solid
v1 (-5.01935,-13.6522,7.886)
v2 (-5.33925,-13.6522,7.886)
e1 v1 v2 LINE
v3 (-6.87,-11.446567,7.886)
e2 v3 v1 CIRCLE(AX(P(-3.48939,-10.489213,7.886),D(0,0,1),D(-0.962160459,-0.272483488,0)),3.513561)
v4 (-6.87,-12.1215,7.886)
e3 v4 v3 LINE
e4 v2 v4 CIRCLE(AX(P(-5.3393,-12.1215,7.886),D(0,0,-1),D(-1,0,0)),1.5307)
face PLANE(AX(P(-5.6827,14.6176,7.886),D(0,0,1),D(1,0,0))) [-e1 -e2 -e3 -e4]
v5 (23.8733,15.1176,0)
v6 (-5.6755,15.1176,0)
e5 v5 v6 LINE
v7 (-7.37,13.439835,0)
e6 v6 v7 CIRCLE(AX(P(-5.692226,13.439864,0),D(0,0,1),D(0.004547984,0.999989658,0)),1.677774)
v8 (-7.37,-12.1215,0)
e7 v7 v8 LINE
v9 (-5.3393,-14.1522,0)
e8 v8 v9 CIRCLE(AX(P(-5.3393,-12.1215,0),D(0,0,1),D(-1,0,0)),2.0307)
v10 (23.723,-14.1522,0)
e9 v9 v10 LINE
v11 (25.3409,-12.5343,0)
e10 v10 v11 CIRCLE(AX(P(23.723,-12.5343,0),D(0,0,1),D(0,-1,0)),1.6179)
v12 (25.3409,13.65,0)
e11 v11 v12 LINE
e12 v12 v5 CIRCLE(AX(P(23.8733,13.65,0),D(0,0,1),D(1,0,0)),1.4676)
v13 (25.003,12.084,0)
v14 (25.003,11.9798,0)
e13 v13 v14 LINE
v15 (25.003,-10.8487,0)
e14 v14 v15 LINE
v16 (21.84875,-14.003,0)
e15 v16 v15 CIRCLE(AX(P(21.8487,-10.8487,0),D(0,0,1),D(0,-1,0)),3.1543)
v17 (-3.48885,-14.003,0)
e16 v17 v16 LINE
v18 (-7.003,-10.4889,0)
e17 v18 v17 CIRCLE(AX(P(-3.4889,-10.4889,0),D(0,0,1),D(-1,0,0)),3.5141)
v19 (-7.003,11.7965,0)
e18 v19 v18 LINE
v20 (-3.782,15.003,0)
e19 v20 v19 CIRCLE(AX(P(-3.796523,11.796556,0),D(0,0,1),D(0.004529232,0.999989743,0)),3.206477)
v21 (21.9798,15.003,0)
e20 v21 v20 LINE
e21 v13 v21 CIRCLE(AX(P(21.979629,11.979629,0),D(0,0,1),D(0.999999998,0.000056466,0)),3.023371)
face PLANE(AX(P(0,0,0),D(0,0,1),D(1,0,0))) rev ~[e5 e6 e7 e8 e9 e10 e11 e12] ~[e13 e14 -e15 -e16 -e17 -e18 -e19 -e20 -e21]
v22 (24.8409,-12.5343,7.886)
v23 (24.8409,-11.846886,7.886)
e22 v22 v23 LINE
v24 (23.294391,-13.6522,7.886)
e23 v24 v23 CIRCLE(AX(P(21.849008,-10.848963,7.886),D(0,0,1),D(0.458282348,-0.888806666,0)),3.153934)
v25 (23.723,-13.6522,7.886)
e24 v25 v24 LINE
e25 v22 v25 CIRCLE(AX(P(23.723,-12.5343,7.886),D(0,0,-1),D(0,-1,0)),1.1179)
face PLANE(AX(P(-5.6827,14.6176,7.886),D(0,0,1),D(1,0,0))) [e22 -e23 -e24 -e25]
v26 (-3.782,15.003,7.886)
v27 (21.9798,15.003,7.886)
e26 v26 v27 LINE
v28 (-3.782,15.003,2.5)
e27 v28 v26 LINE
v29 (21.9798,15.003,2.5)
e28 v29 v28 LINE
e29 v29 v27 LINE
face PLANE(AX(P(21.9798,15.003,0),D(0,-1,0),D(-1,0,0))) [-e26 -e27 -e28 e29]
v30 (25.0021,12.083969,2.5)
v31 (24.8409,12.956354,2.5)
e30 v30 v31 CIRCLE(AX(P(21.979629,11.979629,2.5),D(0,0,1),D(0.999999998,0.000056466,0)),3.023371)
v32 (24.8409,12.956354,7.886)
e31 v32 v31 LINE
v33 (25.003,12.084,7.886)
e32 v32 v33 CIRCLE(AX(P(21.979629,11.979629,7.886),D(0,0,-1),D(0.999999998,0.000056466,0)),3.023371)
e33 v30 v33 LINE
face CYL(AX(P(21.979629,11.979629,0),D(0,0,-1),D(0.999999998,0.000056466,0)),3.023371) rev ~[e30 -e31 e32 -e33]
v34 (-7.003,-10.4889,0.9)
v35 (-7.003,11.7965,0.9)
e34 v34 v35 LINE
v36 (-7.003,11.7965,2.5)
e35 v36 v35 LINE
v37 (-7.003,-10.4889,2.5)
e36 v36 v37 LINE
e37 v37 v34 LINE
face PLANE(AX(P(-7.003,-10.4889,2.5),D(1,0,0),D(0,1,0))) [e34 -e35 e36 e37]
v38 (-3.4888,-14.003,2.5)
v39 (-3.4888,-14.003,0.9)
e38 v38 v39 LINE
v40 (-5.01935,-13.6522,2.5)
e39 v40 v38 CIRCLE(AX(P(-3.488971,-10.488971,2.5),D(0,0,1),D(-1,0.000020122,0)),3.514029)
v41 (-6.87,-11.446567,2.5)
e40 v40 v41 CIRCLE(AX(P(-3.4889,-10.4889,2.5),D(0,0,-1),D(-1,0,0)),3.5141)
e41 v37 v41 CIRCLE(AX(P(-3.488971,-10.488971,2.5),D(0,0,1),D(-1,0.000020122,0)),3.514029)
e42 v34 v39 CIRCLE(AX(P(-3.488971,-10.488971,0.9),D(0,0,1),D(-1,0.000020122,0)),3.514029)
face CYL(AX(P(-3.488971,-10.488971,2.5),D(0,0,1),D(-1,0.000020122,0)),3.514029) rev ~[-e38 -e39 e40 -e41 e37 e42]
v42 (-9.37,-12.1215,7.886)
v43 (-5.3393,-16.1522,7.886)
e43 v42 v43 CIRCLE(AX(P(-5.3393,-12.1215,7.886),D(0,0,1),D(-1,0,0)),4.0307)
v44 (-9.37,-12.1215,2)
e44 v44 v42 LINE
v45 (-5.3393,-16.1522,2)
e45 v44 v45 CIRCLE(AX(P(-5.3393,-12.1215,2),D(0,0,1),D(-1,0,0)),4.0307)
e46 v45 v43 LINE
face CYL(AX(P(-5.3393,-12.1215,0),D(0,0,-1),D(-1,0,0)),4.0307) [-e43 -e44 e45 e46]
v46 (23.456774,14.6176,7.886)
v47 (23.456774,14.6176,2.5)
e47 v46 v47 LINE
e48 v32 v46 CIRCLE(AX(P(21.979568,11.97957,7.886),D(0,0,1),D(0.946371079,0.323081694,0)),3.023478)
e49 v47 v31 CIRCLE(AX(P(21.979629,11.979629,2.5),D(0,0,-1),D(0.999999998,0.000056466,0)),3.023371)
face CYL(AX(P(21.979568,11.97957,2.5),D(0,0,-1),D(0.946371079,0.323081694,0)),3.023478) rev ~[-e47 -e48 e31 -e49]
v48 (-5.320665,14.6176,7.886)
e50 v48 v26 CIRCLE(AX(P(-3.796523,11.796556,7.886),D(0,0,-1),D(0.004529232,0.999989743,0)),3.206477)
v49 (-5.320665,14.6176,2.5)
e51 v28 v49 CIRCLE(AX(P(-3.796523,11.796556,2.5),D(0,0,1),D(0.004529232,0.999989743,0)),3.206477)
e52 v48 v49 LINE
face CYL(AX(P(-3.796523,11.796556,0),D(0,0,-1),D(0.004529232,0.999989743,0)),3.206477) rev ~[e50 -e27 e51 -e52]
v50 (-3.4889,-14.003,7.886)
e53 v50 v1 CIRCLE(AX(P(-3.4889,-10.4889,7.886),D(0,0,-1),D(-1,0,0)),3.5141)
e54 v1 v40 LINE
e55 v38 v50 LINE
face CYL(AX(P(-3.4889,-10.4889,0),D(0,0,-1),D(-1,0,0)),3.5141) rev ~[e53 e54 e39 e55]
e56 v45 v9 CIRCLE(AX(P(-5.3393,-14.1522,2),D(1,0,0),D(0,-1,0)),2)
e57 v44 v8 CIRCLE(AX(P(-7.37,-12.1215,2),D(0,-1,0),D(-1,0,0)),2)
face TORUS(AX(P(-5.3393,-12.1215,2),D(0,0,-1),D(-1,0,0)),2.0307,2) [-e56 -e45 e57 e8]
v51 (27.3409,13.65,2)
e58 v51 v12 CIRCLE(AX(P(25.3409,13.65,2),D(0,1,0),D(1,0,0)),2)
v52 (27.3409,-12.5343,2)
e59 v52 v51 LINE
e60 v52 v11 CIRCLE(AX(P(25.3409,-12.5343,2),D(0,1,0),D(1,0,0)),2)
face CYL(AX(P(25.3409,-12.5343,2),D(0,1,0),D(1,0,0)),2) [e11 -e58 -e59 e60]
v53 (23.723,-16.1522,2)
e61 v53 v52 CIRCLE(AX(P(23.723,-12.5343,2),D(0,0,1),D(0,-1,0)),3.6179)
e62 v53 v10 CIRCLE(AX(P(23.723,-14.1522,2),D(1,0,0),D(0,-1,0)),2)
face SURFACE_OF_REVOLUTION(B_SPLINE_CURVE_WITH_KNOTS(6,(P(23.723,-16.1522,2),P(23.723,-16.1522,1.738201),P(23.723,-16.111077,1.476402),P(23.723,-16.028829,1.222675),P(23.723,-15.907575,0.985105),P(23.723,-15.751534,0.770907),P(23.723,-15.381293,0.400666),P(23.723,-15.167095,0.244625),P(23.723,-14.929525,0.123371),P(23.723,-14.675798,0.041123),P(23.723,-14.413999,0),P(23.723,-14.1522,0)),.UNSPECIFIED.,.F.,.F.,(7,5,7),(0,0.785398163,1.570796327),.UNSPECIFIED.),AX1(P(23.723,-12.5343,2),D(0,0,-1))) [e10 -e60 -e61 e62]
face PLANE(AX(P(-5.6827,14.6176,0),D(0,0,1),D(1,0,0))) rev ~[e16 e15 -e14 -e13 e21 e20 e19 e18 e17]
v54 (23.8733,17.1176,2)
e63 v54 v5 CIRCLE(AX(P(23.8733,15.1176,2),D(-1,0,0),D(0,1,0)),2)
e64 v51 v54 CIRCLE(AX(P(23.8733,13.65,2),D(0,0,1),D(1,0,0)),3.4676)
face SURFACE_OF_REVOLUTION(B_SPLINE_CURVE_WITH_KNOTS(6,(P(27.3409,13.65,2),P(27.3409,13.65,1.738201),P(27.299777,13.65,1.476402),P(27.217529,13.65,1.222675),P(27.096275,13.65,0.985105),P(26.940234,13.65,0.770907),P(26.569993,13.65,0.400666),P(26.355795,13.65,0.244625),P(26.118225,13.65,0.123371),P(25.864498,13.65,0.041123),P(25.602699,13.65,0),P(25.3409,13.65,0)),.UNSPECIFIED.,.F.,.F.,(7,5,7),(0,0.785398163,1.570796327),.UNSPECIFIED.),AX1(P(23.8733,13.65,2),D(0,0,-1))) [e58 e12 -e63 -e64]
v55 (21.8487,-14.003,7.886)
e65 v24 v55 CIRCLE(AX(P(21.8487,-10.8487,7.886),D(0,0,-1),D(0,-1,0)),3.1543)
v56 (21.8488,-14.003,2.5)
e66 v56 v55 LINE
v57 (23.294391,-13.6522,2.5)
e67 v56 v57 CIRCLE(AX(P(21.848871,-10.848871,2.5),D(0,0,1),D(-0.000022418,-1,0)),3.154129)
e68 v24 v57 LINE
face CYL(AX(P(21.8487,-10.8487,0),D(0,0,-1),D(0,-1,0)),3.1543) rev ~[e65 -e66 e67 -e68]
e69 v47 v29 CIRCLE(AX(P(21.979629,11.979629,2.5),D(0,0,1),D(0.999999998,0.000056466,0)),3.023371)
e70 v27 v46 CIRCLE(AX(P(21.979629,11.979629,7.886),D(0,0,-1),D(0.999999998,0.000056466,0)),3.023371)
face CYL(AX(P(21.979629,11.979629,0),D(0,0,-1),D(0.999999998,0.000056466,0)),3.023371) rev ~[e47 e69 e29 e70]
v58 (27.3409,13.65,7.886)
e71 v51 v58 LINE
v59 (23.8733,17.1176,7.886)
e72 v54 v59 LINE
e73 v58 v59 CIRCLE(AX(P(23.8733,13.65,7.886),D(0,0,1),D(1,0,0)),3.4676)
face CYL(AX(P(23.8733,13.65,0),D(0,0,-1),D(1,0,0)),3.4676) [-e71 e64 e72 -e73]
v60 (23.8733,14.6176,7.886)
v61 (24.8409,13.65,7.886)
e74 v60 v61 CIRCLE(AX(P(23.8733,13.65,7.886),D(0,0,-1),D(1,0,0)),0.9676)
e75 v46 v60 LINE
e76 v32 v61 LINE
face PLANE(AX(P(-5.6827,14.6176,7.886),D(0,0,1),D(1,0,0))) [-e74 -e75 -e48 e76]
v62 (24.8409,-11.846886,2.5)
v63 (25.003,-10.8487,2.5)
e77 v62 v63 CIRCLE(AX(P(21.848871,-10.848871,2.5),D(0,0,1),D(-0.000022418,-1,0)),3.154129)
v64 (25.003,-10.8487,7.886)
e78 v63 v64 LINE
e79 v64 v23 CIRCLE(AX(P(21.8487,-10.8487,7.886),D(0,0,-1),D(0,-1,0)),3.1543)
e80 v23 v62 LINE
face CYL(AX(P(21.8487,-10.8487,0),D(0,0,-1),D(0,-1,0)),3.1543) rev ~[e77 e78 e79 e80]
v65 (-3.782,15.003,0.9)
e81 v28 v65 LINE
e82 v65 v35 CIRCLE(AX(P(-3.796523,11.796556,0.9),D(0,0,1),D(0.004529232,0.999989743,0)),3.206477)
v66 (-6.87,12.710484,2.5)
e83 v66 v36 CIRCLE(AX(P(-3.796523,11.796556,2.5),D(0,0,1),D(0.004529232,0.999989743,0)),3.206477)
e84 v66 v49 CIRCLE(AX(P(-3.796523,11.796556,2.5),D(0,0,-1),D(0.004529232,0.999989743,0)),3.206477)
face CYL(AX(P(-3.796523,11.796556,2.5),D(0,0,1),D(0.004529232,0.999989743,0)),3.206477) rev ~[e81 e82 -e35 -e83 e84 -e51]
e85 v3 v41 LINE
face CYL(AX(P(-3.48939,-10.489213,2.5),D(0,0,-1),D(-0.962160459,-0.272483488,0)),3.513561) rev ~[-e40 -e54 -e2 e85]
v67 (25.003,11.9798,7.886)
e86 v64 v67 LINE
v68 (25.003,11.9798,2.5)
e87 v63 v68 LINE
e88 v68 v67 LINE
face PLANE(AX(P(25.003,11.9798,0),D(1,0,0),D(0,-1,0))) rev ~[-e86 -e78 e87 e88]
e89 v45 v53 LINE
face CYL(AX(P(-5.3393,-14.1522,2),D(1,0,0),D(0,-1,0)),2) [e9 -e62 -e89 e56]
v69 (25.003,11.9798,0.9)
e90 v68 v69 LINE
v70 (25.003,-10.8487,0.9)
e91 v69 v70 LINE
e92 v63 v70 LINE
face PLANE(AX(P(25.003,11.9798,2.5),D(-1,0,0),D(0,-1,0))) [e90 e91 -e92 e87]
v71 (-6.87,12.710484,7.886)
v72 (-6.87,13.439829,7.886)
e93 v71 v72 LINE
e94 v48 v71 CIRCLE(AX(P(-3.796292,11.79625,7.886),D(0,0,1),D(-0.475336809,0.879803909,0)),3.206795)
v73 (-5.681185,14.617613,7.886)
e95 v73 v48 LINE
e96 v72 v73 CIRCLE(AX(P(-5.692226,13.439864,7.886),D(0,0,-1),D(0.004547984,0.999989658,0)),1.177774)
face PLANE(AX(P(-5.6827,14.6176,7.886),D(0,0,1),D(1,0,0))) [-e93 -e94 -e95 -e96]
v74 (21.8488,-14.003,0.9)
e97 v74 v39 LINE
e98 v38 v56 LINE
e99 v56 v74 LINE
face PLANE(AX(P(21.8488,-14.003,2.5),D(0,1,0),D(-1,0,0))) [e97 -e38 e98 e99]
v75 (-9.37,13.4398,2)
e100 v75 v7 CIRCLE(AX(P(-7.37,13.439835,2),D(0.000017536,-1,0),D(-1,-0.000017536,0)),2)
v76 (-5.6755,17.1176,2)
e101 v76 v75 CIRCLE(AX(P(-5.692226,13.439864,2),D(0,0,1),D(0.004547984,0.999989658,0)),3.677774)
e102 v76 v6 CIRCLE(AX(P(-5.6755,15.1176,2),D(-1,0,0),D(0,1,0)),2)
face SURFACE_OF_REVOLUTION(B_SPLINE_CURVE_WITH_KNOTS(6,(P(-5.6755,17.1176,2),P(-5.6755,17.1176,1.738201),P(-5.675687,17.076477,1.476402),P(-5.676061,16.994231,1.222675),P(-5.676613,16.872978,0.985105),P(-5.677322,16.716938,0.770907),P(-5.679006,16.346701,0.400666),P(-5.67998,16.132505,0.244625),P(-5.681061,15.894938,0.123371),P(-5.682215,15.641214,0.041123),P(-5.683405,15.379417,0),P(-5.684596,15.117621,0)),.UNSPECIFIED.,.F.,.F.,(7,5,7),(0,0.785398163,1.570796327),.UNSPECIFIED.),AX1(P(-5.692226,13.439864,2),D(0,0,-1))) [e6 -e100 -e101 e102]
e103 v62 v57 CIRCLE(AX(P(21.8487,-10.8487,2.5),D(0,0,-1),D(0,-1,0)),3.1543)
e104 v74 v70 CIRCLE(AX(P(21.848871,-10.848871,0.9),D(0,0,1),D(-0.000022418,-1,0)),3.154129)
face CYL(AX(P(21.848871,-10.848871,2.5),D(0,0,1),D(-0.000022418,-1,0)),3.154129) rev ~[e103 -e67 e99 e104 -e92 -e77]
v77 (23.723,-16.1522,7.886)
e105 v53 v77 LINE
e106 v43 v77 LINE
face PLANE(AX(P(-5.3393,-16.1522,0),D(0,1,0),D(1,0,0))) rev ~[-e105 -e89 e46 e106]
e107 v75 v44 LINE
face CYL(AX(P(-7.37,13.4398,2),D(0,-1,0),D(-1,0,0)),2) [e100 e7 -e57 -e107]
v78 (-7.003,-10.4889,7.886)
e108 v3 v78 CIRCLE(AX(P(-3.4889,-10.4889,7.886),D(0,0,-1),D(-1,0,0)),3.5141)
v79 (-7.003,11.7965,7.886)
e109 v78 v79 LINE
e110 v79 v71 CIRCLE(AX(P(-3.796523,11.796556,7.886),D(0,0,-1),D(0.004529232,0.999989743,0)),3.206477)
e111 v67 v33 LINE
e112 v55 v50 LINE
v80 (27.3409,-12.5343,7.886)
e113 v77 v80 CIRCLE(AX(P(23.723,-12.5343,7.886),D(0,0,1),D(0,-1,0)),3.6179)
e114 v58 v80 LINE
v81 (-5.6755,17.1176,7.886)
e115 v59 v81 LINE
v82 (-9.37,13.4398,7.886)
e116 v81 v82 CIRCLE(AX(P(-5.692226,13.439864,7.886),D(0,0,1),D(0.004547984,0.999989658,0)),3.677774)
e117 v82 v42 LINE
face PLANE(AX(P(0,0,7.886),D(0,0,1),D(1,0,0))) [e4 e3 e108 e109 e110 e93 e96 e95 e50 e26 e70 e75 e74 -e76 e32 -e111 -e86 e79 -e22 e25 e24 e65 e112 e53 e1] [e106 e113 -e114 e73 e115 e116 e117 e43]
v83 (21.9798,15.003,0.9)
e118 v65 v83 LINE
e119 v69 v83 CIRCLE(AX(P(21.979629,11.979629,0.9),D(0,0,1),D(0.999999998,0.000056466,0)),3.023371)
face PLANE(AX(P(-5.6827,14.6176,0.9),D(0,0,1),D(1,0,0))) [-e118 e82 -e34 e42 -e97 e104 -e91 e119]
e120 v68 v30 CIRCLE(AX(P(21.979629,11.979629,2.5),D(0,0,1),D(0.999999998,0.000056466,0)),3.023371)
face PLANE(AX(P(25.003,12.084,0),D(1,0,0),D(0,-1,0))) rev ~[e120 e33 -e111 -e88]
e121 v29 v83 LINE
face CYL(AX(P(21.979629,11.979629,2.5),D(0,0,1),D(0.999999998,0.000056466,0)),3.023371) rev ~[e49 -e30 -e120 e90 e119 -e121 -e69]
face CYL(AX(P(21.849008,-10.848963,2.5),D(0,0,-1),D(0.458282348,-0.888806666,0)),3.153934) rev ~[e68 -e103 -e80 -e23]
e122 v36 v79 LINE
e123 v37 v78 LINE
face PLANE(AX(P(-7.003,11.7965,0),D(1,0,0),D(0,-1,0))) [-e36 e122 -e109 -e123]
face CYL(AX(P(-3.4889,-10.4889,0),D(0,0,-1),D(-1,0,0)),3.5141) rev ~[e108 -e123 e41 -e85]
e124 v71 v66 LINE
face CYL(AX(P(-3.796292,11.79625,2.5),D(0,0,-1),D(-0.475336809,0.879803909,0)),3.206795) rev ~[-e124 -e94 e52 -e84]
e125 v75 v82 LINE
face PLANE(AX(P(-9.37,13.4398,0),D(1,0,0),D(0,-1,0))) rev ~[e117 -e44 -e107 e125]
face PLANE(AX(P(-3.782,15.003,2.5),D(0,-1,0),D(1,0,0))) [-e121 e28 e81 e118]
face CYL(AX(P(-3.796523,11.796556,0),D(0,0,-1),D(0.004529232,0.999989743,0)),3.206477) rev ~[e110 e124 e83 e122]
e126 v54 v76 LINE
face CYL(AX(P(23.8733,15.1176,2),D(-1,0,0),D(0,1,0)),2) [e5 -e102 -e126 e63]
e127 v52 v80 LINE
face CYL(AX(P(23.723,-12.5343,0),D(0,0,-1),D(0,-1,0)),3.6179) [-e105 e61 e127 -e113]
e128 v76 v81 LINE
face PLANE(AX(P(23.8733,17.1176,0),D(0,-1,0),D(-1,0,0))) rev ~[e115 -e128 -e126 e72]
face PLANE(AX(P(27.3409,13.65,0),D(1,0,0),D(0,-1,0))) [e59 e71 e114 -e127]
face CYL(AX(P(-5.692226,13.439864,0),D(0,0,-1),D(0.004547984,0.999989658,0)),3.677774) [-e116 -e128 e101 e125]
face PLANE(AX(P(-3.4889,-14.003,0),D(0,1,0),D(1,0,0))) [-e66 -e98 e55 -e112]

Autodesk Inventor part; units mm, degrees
ref_plane "YZ Plane" through (0, 0, 0) normal (1, 0, 0) x (0, 1, 0)
ref_plane "XZ Plane" through (0, 0, 0) normal (0, 1, 0) x (-1, 0, 0)
sketch "Sketch1" plane through (-3.508, -14.003, 0) normal (0, 0, 1) x (1, 0, 0)
  line L0 (-3.495, 25.7995) -> (-3.495, 3.5141)
  line L1 (28.511, 26.087) -> (28.511, 3.1543)
  line L2 (0.0191, 0) -> (25.3567, 0)
  line L3 (25.4878, 29.006) -> (-0.274, 29.006)
  arc A0 (-3.495, 3.5141) -> (0.0191, 0) centre (0.0191, 3.5141) ccw
  arc A1 (25.3567, 0) -> (28.511, 3.1543) centre (25.3567, 3.1543) ccw
  arc A2 (28.511, 25.9828) -> (25.4878, 29.006) centre (25.4878, 25.9827) ccw
  arc A3 (-0.274, 29.006) -> (-3.495, 25.7995) centre (-0.2885, 25.7995) ccw
  line L4 (9.8544, 29.006) -> (9.8544, 34.006) construction
  point P0 (12.6069, 14.6206)
  dimension "d0" = 5
sketch "Sketch3" plane through (0, 0, 0) normal (0, 0, 1) x (1, 0, 0)
  arc A0 (-5.6755, 17.1176) -> (-9.37, 13.4398) centre (-5.6922, 13.4398) ccw
  line L0 (-9.37, 13.4398) -> (-9.37, -12.1215)
  arc A1 (-9.37, -12.1215) -> (-5.3393, -16.1522) centre (-5.3393, -12.1215) ccw
  line L1 (-5.3393, -16.1522) -> (23.723, -16.1522)
  arc A2 (23.723, -16.1522) -> (27.3409, -12.5343) centre (23.723, -12.5343) ccw
  line L2 (27.3409, 13.7696) -> (27.3409, -12.5343)
  arc A3 (27.3409, 13.65) -> (23.8733, 17.1176) centre (23.8733, 13.65) ccw
  line L3 (23.8733, 17.1176) -> (-5.6755, 17.1176)
  point P0 (0, 0)
  point P1 (25.003, 11.9798)
  point P2 (9.0989, 0.6176)
extrude "Extrusion1" add sketch "Sketch3" along normal blind 7.886
shell "Shell1" thickness 2.5 removed faces 1 at (4.2862, 6.0277, 7.886)
ref_plane "Work Plane3" through (-5.6827, 14.6176, 2.5) normal (0, 0, 1) x (1, 0, 0)
sketch "Sketch4" plane through (-5.6827, 14.6176, 2.5) normal (0, 0, 1) x (1, 0, 0)
  point P0 (5.6827, -14.6176)
extrude "Extrusion2" cut sketch "Sketch1" along normal blind 21
sketch "Sketch5" plane through (-5.6827, 14.6176, 2.5) normal (0, 0, 1) x (1, 0, 0)
  arc A0 (0.3621, 0) -> (-1.1873, -1.9071) centre (1.8862, -2.8211) ccw projected
  line L0 (0.3621, 0) -> (0, 0) projected
  arc A1 (0, 0) -> (-1.1873, -1.1778) centre (-0.0094, -1.1778) ccw projected
  line L1 (-1.1873, -1.1778) -> (-1.1873, -1.9071) projected
  arc A2 (-1.1873, -26.0642) -> (0.6634, -28.2698) centre (2.1939, -25.1065) ccw projected
  line L2 (-1.1873, -26.0642) -> (-1.1873, -26.7391) projected
  arc A3 (-1.1873, -26.7391) -> (0.3435, -28.2698) centre (0.3435, -26.7391) ccw projected
  line L3 (0.3435, -28.2698) -> (0.6634, -28.2698) projected
  arc A4 (28.9771, -28.2698) -> (30.5236, -26.4645) centre (27.5315, -25.4663) ccw projected
  line L4 (28.9771, -28.2698) -> (29.4057, -28.2698) projected
  arc A5 (29.4057, -28.2698) -> (30.5236, -27.1519) centre (29.4057, -27.1519) ccw projected
  line L5 (30.5236, -27.1519) -> (30.5236, -26.4645) projected
  arc A6 (30.5236, -1.6612) -> (29.1395, 0) centre (27.6625, -2.6379) ccw projected
  line L6 (30.5236, -1.6612) -> (30.5236, -0.9676) projected
  arc A7 (30.5236, -0.9676) -> (29.556, 0) centre (29.556, -0.9676) ccw projected
  line L7 (29.556, 0) -> (29.1395, 0) projected
  point P0 (5.6827, -14.6176)
extrude "Extrusion3" add sketch "Sketch5" along normal up to surface (5.386 mm away)
sketch "Sketch6" plane through (-5.6827, 14.6176, 2.5) normal (0, 0, 1) x (1, 0, 0)
  arc A0 (27.5315, -28.6206) -> (30.6857, -25.4663) centre (27.5315, -25.4663) ccw projected
  line L0 (2.1939, -28.6206) -> (27.5315, -28.6206) projected
  arc A1 (-1.3203, -25.1065) -> (2.1939, -28.6206) centre (2.1939, -25.1065) ccw projected
  line L1 (-1.3203, -2.8211) -> (-1.3203, -25.1065) projected
  arc A2 (1.9007, 0.3854) -> (-1.3203, -2.8211) centre (1.8862, -2.8211) ccw projected
  line L2 (27.6625, 0.3854) -> (1.9007, 0.3854) projected
  arc A3 (30.6857, -2.6378) -> (27.6625, 0.3854) centre (27.6625, -2.6379) ccw projected
  line L3 (30.6857, -25.4663) -> (30.6857, -2.6378) projected
  point P0 (5.6827, -14.6176)
extrude "Extrusion4" add sketch "Sketch6" against normal up to surface (2.5 mm away)
sketch "Sketch7" plane through (-5.6827, 14.6176, 2.5) normal (0, 0, 1) x (1, 0, 0)
  arc A0 (27.5315, -28.6206) -> (30.6857, -25.4663) centre (27.5315, -25.4663) ccw projected
  line L0 (30.6857, -2.6378) -> (30.6857, -25.4663) projected
  arc A1 (30.6857, -2.6378) -> (27.6625, 0.3854) centre (27.6625, -2.6379) ccw projected
  line L1 (1.9007, 0.3854) -> (27.6625, 0.3854) projected
  arc A2 (1.9007, 0.3854) -> (-1.3203, -2.8211) centre (1.8862, -2.8211) ccw projected
  line L2 (-1.3203, -25.1065) -> (-1.3203, -2.8211) projected
  arc A3 (-1.3203, -25.1065) -> (2.1939, -28.6206) centre (2.1939, -25.1065) ccw projected
  line L3 (27.5315, -28.6206) -> (2.1939, -28.6206) projected
  arc A4 (1.8968, -1.1146) -> (0.1797, -2.8211) centre (1.8862, -2.8211) ccw
  line L4 (1.8968, -1.1146) -> (27.6625, -1.1146)
  arc A5 (29.1857, -2.6379) -> (27.6625, -1.1146) centre (27.6625, -2.6379) ccw
  line L5 (29.1857, -2.6379) -> (29.1857, -25.4663)
  arc A6 (27.5315, -27.1206) -> (29.1857, -25.4663) centre (27.5315, -25.4663) ccw
  line L6 (27.5315, -27.1206) -> (2.1939, -27.1206)
  arc A7 (0.1797, -25.1065) -> (2.1939, -27.1206) centre (2.1939, -25.1065) ccw
  line L7 (0.1797, -25.1065) -> (0.1797, -2.8211)
  point P0 (5.6827, -14.6176)
  dimension "d11" = 1.5
extrude "Extrusion5" [suppressed]
fillet "Fillet1" radius 2 8 edges at (26.3252, 16.102, 0) (27.3409, 0.5579, 0) (26.2812, -15.0926, 0) (9.1919, -16.1522, 0) (-8.1894, -14.9717, 0) (-9.37, 0.6592, 0) (-8.2869, 16.0463, 0) (9.0989, 17.1176, 0)
sketch "Sketch9" plane through (-5.6827, 14.6176, 2.5) normal (0, 0, 1) x (1, 0, 0)
  arc A0 (27.5315, -28.6206) -> (30.6857, -25.4663) centre (27.5315, -25.4663) ccw projected
  line L0 (30.6857, -2.6378) -> (30.6857, -25.4663) projected
  arc A1 (30.6857, -2.6378) -> (27.6625, 0.3854) centre (27.6625, -2.6379) ccw projected
  line L1 (1.9007, 0.3854) -> (27.6625, 0.3854) projected
  arc A2 (1.9007, 0.3854) -> (-1.3203, -2.8211) centre (1.8862, -2.8211) ccw projected
  line L2 (-1.3203, -25.1065) -> (-1.3203, -2.8211) projected
  arc A3 (-1.3203, -25.1065) -> (2.1939, -28.6206) centre (2.1939, -25.1065) ccw projected
  line L3 (27.5315, -28.6206) -> (2.1939, -28.6206) projected
  point P0 (5.6827, -14.6176)
extrude "Extrusion7" cut sketch "Sketch9" against normal blind 1.6
properties part number "GoPro_Cap_Lens"
